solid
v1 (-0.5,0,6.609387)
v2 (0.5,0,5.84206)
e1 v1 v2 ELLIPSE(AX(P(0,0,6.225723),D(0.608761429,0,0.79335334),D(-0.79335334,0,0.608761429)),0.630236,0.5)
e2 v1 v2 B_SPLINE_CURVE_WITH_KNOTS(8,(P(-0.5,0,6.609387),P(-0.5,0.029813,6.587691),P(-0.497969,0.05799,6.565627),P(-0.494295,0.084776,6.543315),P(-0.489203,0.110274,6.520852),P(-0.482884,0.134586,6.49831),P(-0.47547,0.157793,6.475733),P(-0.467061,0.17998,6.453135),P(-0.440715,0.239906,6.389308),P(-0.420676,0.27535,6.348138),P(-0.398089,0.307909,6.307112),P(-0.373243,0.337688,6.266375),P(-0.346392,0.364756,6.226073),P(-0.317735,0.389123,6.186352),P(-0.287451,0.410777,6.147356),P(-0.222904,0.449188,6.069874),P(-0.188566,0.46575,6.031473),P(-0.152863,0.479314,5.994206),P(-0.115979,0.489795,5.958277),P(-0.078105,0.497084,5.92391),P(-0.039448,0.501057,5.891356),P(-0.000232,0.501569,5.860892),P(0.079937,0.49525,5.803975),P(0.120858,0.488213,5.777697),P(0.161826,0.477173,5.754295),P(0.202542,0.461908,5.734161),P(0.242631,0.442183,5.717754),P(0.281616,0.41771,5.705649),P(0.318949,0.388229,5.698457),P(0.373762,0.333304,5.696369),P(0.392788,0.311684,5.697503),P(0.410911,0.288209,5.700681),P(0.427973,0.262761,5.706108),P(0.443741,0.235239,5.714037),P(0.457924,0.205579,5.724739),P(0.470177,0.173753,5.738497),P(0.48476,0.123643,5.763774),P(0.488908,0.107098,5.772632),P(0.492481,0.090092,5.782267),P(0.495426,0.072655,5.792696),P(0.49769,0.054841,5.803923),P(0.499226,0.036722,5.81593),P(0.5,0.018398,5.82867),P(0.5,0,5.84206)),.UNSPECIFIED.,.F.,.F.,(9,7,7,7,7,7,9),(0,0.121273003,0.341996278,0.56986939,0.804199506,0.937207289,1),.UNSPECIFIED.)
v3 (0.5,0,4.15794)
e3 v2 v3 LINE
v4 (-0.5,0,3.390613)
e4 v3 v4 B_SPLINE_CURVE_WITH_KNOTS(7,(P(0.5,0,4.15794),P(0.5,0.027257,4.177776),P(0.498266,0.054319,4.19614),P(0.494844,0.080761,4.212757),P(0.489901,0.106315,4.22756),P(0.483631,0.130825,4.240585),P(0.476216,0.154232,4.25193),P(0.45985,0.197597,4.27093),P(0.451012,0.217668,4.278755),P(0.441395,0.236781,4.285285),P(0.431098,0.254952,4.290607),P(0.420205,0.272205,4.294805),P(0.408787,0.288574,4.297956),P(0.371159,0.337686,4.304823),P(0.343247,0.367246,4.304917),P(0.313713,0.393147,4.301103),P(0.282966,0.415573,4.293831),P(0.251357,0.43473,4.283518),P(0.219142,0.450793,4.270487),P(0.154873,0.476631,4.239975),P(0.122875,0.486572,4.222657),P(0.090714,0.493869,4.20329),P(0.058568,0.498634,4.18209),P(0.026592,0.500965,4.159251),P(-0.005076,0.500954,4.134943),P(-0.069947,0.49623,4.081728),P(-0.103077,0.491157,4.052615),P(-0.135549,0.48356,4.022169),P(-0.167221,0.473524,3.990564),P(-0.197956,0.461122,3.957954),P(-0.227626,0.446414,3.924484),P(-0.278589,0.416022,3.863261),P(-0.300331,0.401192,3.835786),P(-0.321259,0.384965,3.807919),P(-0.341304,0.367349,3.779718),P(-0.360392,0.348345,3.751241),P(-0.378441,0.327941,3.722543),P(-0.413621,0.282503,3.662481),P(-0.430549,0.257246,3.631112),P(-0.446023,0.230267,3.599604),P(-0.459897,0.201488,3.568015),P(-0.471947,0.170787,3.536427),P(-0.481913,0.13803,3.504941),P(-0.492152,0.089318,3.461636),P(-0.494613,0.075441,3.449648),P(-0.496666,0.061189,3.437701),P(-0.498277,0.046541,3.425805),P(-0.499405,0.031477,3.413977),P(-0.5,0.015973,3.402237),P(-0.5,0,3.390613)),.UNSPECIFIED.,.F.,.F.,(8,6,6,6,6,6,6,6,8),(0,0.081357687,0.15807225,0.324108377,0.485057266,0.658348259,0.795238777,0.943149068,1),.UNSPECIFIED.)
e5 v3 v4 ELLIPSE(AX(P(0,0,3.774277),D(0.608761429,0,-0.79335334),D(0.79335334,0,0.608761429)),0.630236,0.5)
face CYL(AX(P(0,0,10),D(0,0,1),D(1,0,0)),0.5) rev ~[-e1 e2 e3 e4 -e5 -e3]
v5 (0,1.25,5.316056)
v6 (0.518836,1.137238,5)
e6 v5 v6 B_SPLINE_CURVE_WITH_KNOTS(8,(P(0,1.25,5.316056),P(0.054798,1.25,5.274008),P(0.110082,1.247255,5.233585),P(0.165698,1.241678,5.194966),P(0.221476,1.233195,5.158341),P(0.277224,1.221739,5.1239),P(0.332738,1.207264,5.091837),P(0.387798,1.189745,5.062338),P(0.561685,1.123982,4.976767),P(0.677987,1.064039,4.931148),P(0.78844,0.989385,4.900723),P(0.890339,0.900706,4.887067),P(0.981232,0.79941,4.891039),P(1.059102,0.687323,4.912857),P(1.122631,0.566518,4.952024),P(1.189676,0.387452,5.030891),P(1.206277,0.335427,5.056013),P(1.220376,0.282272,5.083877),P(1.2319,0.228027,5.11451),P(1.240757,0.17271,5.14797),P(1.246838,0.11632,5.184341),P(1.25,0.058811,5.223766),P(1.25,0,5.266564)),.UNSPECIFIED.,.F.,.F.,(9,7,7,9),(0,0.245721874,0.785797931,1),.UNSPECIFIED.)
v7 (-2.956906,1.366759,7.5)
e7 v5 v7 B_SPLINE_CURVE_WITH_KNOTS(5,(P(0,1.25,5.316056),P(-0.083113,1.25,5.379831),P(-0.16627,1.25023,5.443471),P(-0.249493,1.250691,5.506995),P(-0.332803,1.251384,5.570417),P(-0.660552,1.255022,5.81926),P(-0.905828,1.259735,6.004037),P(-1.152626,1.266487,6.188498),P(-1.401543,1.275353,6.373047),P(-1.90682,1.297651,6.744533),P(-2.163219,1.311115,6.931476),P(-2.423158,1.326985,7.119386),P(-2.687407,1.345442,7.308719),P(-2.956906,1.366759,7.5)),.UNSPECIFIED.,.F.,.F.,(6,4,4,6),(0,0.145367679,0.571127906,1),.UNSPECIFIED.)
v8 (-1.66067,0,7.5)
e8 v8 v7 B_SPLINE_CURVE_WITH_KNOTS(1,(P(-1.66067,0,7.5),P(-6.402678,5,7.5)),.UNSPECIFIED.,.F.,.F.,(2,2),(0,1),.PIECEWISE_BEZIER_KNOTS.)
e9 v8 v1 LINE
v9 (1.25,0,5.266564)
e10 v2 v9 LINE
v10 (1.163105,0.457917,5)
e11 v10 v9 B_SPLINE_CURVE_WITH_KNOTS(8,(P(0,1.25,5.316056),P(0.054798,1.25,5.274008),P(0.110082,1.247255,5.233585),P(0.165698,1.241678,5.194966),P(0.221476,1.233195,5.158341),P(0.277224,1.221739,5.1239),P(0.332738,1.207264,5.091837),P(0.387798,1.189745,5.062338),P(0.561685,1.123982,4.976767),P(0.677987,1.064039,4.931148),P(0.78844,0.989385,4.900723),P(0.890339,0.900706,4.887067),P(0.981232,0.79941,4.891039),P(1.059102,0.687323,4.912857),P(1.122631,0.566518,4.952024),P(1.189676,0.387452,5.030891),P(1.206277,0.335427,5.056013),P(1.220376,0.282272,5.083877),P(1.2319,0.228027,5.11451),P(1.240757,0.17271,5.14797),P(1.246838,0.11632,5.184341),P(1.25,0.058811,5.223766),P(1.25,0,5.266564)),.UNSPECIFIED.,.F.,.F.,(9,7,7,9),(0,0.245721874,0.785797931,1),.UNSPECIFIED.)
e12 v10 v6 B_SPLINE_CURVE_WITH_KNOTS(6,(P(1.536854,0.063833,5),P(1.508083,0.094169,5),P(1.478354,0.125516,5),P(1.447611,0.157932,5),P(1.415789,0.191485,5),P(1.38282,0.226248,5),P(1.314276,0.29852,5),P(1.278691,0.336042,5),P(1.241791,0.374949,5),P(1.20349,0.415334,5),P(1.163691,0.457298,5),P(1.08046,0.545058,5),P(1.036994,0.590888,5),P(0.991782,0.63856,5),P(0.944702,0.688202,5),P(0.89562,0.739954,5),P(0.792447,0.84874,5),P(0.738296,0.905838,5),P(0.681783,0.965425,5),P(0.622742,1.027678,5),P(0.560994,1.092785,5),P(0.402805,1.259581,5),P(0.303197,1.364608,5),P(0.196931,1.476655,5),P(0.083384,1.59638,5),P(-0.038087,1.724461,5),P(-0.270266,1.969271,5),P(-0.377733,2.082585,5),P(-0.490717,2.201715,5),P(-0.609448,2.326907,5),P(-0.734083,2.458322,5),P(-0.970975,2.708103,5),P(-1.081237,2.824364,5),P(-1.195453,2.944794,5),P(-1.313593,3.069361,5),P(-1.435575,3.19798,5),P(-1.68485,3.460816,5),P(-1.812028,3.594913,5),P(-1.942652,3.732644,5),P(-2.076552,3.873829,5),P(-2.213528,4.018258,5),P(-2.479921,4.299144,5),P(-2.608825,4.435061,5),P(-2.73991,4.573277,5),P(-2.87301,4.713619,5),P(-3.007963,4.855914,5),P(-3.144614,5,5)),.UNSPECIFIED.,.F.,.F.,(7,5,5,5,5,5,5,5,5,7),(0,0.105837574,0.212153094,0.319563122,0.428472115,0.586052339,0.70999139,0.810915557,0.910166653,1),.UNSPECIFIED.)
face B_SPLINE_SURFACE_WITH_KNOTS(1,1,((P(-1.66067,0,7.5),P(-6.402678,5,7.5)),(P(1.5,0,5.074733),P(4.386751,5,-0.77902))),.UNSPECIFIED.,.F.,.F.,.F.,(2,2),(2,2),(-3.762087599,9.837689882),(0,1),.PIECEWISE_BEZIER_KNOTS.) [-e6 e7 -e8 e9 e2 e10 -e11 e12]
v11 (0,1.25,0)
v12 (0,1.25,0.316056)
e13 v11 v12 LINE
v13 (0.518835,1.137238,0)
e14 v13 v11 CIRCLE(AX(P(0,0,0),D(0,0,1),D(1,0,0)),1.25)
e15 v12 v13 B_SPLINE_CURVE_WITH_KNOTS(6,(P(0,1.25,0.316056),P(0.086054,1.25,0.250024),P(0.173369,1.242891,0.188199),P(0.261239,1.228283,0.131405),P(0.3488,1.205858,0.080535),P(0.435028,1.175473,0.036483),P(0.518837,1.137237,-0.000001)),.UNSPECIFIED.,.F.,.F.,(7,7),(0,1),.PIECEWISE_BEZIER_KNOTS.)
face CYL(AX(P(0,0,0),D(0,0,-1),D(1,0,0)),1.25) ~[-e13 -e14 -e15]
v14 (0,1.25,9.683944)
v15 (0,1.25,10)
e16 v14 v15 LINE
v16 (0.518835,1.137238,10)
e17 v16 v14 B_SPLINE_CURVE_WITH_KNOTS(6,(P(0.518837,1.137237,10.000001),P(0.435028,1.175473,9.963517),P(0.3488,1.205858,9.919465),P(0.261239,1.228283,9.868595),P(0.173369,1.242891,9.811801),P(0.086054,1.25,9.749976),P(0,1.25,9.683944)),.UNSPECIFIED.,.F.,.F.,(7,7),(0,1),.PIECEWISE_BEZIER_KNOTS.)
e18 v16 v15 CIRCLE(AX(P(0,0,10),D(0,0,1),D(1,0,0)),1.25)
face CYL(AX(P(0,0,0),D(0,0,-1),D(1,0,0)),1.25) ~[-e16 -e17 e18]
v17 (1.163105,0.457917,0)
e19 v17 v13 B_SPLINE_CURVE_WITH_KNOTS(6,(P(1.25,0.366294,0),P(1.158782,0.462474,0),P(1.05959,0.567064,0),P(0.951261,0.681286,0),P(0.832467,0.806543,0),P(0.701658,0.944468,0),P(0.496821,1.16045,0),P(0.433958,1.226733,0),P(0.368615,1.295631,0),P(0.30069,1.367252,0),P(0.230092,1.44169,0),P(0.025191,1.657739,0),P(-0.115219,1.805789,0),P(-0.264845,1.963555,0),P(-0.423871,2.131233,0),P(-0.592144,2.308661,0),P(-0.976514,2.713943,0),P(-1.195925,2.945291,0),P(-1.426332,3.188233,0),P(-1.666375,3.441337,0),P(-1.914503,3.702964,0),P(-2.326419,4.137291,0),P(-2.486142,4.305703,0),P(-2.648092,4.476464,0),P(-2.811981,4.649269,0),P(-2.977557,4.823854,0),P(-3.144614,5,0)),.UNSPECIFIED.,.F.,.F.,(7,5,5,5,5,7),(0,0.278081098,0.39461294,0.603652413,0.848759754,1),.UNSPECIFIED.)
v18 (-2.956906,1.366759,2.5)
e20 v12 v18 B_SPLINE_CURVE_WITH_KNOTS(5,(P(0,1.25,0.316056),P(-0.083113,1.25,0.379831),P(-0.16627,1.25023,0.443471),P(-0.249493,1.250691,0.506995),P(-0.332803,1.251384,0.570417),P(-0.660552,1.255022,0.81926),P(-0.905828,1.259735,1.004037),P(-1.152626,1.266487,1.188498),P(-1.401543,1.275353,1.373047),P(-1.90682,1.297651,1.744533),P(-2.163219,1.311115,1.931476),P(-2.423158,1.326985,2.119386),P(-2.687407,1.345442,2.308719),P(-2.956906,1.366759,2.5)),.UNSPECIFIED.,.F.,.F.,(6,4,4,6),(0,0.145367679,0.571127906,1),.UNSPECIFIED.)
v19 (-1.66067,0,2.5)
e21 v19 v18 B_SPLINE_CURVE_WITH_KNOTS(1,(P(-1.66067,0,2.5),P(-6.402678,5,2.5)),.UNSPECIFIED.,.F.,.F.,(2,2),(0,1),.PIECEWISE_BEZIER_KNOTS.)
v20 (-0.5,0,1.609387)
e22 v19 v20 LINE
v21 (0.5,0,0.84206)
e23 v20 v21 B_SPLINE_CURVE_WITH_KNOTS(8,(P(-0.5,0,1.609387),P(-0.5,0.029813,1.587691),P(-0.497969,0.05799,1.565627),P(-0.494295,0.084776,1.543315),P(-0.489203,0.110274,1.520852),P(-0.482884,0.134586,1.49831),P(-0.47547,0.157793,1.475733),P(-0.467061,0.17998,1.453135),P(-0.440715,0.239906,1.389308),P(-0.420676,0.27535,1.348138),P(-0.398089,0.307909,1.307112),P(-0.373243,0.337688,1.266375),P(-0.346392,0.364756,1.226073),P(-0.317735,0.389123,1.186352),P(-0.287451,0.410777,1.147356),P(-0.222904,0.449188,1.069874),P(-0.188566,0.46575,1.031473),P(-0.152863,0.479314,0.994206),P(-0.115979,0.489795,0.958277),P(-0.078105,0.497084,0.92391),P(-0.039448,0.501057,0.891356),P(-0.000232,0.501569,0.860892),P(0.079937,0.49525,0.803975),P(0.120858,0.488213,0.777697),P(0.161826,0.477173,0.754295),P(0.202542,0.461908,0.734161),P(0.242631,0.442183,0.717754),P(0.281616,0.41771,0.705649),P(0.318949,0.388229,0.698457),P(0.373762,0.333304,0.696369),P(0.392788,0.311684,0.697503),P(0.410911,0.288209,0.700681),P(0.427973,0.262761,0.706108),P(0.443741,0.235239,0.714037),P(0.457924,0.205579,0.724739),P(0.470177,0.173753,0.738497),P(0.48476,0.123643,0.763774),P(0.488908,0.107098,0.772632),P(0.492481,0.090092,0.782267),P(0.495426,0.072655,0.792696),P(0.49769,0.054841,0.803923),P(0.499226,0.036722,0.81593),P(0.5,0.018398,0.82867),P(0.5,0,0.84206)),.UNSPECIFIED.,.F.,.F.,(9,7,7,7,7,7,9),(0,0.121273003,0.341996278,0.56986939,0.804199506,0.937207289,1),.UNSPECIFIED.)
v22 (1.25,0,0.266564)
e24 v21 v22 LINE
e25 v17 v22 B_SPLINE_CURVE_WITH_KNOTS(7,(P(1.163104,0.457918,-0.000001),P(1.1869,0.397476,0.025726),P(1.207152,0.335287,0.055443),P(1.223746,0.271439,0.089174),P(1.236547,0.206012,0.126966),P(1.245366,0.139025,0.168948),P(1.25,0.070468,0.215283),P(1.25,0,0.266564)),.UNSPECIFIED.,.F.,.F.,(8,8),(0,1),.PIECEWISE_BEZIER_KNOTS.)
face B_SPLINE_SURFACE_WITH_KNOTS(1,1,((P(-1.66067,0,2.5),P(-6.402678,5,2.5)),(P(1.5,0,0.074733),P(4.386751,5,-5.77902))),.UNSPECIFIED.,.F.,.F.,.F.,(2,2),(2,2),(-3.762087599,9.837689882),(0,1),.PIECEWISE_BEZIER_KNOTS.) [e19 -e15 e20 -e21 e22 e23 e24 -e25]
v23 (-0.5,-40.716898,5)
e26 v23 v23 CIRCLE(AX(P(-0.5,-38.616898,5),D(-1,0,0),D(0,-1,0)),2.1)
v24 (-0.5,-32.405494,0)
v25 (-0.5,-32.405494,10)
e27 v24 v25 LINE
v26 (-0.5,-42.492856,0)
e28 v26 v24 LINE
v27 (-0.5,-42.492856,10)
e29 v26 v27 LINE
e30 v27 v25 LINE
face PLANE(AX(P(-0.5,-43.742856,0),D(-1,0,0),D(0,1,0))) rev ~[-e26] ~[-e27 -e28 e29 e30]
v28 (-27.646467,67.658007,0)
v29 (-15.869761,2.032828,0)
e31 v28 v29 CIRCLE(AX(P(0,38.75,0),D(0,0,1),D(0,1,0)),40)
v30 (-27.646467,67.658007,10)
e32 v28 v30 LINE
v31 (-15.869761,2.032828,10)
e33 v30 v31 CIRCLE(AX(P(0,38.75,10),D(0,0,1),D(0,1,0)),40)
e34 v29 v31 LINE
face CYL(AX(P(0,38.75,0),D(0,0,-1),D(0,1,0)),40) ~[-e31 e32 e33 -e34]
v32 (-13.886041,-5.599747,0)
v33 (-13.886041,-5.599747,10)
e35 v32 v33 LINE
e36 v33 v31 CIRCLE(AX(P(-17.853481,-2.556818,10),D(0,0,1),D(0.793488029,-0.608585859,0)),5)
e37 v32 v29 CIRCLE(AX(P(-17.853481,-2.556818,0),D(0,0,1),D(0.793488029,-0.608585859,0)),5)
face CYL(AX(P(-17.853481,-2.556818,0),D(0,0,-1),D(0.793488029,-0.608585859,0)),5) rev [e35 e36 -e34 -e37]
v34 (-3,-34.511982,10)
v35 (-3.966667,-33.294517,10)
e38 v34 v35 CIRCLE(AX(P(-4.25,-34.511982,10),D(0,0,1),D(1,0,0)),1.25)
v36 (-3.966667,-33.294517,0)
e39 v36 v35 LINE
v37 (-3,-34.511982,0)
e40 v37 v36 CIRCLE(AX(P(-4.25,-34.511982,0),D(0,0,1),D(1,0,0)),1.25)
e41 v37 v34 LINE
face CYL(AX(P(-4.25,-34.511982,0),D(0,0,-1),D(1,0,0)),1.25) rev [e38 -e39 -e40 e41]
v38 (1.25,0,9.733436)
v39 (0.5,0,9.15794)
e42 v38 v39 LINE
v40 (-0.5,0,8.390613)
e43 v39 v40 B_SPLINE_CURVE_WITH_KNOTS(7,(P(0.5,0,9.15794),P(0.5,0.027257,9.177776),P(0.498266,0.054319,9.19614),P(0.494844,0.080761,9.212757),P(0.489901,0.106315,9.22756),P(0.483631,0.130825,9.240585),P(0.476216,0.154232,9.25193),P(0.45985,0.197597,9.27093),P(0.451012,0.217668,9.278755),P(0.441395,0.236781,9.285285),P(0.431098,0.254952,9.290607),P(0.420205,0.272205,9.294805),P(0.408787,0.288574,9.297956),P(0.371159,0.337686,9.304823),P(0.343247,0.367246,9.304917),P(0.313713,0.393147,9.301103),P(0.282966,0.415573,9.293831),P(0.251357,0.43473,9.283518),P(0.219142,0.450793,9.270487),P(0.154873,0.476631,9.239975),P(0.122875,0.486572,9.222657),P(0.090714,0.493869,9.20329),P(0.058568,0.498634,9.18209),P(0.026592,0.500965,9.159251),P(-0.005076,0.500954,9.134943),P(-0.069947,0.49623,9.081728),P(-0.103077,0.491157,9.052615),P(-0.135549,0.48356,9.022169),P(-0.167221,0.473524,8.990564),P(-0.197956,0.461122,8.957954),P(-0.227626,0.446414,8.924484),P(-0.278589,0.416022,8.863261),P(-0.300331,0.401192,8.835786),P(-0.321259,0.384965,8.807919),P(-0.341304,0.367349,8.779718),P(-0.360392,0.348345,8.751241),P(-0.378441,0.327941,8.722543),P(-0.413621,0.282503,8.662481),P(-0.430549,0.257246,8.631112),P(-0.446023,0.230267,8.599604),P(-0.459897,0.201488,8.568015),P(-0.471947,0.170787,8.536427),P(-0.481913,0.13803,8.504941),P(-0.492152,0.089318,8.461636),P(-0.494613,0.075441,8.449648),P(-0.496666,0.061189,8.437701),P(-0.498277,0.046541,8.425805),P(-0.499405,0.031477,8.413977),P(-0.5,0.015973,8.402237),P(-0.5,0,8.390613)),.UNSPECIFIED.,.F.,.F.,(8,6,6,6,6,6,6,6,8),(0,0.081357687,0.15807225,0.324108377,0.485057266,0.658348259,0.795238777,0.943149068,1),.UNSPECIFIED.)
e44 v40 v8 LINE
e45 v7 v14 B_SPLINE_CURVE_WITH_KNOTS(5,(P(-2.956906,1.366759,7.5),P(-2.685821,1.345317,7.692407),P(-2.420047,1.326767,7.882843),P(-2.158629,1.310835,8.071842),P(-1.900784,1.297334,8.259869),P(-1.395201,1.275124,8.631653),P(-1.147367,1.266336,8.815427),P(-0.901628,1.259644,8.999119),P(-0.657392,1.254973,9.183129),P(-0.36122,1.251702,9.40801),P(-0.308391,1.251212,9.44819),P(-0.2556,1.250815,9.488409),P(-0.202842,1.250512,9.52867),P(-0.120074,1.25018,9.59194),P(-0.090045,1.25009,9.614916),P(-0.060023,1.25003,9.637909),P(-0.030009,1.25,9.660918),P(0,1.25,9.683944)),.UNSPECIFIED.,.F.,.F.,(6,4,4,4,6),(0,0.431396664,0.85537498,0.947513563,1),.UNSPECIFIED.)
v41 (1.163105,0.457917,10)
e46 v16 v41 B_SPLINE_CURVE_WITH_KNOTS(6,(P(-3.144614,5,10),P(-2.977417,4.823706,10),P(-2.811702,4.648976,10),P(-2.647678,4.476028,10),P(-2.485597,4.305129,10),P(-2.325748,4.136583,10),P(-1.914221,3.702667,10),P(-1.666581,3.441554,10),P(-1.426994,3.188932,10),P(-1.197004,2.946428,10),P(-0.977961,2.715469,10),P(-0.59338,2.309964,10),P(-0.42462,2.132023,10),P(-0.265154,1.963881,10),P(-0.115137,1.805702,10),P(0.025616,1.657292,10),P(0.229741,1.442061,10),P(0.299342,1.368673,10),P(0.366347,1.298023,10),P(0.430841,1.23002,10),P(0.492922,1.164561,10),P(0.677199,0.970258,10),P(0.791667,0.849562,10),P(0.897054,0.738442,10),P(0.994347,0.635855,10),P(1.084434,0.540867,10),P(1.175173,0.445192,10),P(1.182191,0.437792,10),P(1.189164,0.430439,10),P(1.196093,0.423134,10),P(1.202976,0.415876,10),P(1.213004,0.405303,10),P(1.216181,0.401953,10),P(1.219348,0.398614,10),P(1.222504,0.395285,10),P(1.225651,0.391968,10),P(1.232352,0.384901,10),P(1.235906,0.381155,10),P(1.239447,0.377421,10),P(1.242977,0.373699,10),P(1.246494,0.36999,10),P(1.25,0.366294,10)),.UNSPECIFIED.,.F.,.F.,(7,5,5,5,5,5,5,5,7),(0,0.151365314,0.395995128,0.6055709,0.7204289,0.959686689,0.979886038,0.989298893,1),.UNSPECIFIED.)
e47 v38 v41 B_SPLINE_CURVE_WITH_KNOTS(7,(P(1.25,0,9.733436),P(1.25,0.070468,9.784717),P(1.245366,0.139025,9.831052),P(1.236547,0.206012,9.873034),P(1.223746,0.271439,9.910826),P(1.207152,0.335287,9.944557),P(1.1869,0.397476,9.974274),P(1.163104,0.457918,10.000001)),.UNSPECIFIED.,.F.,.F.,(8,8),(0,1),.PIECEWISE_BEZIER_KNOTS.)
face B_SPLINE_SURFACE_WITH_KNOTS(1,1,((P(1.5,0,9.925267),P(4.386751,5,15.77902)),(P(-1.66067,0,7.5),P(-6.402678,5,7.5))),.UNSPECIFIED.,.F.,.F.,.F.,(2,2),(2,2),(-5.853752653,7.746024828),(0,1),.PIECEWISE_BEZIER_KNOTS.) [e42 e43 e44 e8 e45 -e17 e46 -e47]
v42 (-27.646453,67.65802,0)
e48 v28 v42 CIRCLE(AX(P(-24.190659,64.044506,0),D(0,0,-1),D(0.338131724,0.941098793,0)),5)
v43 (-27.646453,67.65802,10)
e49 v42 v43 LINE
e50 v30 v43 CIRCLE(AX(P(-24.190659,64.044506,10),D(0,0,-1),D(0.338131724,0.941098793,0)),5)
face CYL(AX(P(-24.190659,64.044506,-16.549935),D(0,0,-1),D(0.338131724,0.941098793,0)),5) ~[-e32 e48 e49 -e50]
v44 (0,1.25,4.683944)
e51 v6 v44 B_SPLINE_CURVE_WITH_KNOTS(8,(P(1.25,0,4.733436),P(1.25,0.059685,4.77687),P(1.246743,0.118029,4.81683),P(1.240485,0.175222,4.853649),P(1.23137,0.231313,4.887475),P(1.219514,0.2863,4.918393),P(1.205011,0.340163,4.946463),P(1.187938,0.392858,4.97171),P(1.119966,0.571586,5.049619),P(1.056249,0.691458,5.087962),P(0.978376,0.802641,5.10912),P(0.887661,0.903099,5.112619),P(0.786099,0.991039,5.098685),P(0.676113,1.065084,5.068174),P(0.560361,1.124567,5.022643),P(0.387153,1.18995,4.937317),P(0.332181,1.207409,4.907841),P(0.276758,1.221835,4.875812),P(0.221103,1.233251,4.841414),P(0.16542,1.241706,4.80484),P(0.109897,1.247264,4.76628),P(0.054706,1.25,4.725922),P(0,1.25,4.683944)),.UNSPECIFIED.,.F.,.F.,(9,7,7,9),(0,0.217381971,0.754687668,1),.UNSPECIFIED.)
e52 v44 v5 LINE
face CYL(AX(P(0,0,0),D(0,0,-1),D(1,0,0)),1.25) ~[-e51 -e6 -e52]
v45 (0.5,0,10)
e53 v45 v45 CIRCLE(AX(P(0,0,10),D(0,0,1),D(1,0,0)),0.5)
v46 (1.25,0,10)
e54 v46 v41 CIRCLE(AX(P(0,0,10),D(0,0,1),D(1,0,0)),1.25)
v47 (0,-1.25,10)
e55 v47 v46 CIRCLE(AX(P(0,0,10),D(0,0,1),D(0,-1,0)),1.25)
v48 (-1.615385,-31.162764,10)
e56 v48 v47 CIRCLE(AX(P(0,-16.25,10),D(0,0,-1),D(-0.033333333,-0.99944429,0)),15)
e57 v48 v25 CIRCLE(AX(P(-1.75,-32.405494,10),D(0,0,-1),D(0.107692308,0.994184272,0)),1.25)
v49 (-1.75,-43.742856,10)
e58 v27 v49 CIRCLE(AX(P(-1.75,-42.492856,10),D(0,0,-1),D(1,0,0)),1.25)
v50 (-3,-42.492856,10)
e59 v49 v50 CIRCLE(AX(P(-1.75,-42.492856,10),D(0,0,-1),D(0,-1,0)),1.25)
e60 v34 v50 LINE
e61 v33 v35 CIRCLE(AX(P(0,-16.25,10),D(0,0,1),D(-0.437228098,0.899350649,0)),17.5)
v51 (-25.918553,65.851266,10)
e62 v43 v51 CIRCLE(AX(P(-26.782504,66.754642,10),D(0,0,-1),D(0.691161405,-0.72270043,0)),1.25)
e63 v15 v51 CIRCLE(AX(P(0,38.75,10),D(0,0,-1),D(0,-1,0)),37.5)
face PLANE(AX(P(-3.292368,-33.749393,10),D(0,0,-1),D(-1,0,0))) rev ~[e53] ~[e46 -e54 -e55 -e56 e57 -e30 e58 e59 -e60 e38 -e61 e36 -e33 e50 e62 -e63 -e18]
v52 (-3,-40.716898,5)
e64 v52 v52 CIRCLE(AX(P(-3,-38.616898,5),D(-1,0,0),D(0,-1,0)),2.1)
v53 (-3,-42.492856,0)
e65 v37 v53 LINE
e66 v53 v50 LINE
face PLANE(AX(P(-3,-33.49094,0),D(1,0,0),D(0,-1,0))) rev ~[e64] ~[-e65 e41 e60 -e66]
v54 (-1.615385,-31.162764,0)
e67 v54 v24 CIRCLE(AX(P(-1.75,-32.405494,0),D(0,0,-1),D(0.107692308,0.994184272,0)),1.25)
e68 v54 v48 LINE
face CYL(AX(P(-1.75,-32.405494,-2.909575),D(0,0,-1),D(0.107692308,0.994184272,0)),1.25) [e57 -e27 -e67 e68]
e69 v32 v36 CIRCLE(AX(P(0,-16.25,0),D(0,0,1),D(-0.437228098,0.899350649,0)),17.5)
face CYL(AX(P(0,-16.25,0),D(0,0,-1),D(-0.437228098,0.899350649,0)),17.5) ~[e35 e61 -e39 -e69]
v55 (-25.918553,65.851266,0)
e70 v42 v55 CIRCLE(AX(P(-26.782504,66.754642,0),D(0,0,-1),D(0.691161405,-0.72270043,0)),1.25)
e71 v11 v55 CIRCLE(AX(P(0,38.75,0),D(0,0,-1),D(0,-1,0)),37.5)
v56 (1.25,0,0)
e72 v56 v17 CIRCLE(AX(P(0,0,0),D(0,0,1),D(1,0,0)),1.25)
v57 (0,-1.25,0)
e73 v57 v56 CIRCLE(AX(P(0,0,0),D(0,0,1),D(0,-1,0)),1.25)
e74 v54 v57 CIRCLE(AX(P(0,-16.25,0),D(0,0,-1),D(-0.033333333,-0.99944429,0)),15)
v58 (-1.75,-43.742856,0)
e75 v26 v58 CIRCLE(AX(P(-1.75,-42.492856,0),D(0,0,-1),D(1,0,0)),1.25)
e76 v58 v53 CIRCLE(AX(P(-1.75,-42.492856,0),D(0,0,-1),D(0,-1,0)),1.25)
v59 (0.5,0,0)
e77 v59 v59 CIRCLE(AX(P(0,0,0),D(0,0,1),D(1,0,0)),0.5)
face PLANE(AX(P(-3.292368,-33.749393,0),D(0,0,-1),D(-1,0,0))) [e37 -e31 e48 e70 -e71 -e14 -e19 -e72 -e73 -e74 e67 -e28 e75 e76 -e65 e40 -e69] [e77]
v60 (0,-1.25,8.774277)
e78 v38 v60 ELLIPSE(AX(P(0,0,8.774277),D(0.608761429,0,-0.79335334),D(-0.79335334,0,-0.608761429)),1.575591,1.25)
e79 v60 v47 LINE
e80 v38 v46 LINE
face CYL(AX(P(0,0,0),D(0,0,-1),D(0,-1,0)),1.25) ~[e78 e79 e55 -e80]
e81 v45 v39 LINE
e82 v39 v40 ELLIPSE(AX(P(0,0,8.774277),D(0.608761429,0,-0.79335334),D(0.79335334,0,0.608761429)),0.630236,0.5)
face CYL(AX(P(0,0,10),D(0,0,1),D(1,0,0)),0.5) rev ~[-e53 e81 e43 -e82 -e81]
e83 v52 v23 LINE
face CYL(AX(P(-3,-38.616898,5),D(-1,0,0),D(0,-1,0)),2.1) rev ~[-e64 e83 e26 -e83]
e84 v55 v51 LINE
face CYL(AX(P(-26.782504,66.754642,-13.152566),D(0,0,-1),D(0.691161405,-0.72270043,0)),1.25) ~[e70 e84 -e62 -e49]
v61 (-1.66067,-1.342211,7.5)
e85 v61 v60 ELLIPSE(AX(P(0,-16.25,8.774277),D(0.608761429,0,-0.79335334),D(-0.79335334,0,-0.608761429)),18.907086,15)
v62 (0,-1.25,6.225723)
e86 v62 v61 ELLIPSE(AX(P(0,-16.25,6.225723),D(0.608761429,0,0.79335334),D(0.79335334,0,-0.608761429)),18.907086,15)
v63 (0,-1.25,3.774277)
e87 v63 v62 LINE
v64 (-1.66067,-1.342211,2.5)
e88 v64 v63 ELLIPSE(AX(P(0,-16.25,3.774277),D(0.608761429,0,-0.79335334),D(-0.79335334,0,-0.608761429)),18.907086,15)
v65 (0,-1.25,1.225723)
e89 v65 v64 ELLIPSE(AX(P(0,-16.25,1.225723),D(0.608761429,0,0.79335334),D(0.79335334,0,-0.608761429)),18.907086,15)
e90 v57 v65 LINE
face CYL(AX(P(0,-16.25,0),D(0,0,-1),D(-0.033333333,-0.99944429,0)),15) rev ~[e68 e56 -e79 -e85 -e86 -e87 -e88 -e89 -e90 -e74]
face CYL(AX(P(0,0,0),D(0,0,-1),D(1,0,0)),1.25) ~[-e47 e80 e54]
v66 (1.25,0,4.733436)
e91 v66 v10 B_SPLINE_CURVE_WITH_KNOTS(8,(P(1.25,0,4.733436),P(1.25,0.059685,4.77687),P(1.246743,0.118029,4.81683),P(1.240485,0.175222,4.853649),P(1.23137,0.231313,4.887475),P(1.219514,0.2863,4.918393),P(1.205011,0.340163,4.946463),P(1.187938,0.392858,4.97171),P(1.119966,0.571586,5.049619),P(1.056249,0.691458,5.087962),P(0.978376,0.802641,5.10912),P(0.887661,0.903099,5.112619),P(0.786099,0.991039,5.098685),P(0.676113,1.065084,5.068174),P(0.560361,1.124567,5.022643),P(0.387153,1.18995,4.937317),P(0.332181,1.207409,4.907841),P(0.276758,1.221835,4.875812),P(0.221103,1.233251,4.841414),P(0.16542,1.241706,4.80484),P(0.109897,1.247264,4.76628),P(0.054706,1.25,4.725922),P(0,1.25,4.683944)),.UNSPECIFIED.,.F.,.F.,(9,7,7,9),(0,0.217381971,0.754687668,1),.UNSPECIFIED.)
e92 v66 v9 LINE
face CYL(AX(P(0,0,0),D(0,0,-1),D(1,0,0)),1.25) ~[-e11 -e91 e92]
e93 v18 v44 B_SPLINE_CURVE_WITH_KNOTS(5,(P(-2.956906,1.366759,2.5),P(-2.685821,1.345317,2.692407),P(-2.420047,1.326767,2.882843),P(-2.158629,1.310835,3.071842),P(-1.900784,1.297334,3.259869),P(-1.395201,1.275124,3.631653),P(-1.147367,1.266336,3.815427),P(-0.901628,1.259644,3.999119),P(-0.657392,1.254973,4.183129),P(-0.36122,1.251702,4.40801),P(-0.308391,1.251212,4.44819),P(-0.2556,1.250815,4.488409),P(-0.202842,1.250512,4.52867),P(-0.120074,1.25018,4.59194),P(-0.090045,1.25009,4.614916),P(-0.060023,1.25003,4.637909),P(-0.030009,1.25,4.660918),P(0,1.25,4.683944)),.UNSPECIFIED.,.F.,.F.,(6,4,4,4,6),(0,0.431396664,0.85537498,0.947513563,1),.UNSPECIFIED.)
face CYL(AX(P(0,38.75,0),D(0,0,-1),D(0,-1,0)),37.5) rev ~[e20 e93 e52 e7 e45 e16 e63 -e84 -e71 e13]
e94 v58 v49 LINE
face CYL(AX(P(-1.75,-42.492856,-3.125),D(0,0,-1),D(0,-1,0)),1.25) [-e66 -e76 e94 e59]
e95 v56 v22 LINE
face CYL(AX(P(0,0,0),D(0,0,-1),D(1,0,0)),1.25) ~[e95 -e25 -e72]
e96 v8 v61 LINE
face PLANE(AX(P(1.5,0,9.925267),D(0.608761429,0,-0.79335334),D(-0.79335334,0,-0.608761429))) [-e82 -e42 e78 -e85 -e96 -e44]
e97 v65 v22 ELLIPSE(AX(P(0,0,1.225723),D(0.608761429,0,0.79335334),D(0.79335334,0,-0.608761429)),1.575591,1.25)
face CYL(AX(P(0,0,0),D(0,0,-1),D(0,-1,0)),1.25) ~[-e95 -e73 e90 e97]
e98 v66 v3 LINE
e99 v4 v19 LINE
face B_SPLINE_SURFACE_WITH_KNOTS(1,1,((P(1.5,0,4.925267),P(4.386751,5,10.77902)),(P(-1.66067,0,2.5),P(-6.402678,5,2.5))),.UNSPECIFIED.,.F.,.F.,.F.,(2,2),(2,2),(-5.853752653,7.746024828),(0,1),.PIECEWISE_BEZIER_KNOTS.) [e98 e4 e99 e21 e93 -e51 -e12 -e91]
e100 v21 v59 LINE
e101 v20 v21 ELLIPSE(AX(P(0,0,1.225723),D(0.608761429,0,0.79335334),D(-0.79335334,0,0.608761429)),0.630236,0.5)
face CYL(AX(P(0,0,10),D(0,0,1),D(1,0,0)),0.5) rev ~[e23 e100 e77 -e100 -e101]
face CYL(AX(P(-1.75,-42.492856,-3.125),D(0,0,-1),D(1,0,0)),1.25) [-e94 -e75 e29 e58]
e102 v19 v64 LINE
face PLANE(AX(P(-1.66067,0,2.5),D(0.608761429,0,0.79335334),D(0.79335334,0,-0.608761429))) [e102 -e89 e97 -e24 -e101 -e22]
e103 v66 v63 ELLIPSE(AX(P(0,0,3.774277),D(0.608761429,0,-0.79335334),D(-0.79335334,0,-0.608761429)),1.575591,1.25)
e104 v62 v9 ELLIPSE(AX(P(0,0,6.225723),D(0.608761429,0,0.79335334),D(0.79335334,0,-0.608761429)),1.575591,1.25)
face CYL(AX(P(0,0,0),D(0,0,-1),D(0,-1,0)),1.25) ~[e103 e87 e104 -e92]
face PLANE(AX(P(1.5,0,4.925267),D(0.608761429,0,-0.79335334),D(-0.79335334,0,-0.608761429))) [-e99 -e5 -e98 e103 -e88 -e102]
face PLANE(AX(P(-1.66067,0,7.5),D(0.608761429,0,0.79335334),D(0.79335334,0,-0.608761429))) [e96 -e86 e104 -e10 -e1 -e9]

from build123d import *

# Parameters (mm, degrees)
F1_DEPTH       = 10
F2_W           = 45
F2_H           = 10
F3_DEPTH       = 10
F4_R           = 0.5
F5_DEPTH       = 10
F6_R           = 2.1
F7_DEPTH       = 2.5
F8_T1_DEPTH    = 10
F8_T3_DEPTH    = 43.0998702926
F9_T1_DEPTH    = 10
F9_T3_DEPTH    = 15.8191503542
F9_T5_DEPTH    = 16.25
F9_T7_DEPTH    = 36.3051320704
F11_DEPTH      = 5
F11_TAPER      = -30
F11_DEPTH_BACK = 5


# Not quite as in the source:
# - a fillet or chamfer that OpenCascade refuses, or shapes differently, is made with other operations: its cross-section is extruded or revolved along the edge and cut away or added


with BuildPart() as f1:
    # F0 (on Top) → F1 (new body)
    with BuildSketch(Plane.XY):
        with BuildLine():
            ThreePointArc((0, -1.25), (0.8838834765, -0.8838834765), (1.25, 0))
            ThreePointArc((1.25, 0), (0.8838834765, 0.8838834765), (0, 1.25))
            ThreePointArc((0, 1.25), (-1.25, 0), (0, -1.25))
        make_face()
        with BuildLine():
            ThreePointArc((0, -1.25), (-1.25, 0), (0, 1.25))
            ThreePointArc((0, 1.25), (-3.9258033341, 0.8039751431), (-7.6514917116, -0.5113636364))
            ThreePointArc((-7.6514917116, -0.5113636364), (-3.8435305739, -1.0649126927), (0, -1.25))
        make_face()
        with BuildLine():
            ThreePointArc((-7.6514917116, -0.5113636364), (-3.9258033341, 0.8039751431), (0, 1.25))
            ThreePointArc((0, 1.25), (-37.5, 38.75), (0, 76.25))
            Line((0, 76.25), (0, 78.75))
            ThreePointArc((0, 78.75), (-39.8149126927, 42.5935305739), (-7.6514917116, -0.5113636364))
        make_face()
        with BuildLine():
            ThreePointArc((-0.5, -31.2416643506), (-14.9979159429, -15.9999652609), (0, -1.25))
            ThreePointArc((0, -1.25), (-3.8435305739, -1.0649126927), (-7.6514917116, -0.5113636364))
            ThreePointArc((-7.6514917116, -0.5113636364), (-17.3284932243, -18.69403817), (-3, -33.4909396496))
            Line((-3, -33.4909396496), (-3, -31.2416643506))
            Line((-3, -31.2416643506), (-0.5, -31.2416643506))
        make_face()
        with BuildLine():
            Line((-0.5, -33.7428556845), (-0.5, -31.2416643506))
            Line((-0.5, -31.2416643506), (-3, -31.2416643506))
            Line((-3, -31.2416643506), (-3, -33.4909396496))
            ThreePointArc((-3, -33.4909396496), (-1.7545271221, -33.661824562), (-0.5, -33.7428556845))
        make_face()
        with BuildLine():
            ThreePointArc((-0.5, -33.7428556845), (-1.7545271221, -33.661824562), (-3, -33.4909396496))
            Line((-3, -33.4909396496), (-3, -43.7428556845))
            Line((-3, -43.7428556845), (-0.5, -43.7428556845))
            Line((-0.5, -43.7428556845), (-0.5, -33.7428556845))
        make_face()
    extrude(amount=F1_DEPTH)

    # F2 (on Top) → F3 (cut, through all)
    with BuildSketch(Plane.XY):
        with Locations((0, 73.75)):
            Rectangle(F2_W, F2_H)
    extrude(amount=F3_DEPTH, mode=Mode.SUBTRACT)

    # F4 (on face) → F5 (cut, through all)
    with BuildSketch(Plane.XY.offset(10)):
        Circle(F4_R)
    extrude(amount=-F5_DEPTH, mode=Mode.SUBTRACT)

    # F6 (on face) → F7 (cut, through all)
    with BuildSketch(Plane(origin=(-3, 0, 0), x_dir=(0, -1, 0), z_dir=(-1, 0, 0))):
        with Locations((38.6168976671, 5)):
            Circle(F6_R)
    extrude(amount=-F7_DEPTH, mode=Mode.SUBTRACT)

    # F8: fillet of radius 5 on 2 edges, made by hand

    # F8_s2 → F8_t1 (join)
    with BuildSketch(Plane.XY):
        with BuildLine():
            ThreePointArc((-13.8860405137, -5.5997474747), (-13.0142523991, -1.2990941124), (-15.8697605871, 2.0328282828))
            ThreePointArc((-15.8697605871, 2.0328282828), (-11.8292246388, 0.5391449396), (-7.6514917116, -0.5113636364))
            ThreePointArc((-7.6514917116, -0.5113636364), (-11.0652264374, -2.6923171637), (-13.8860405137, -5.5997474747))
        make_face()
    extrude(amount=F8_T1_DEPTH)

    # F8_s4 → F8_t3 (cut)
    with BuildSketch(Plane.XY.offset(-16.5499351463)):
        with BuildLine():
            ThreePointArc((-22.5, 68.75), (-25.2284691248, 68.9356152516), (-27.6464669917, 67.6580068991))
            ThreePointArc((-27.6464669917, 67.6580068991), (-25.1595214868, 69.8465991477), (-22.5, 71.8218913883))
            Line((-22.5, 71.8218913883), (-22.5, 68.75))
        make_face()
    extrude(amount=F8_T3_DEPTH, mode=Mode.SUBTRACT)

    # F9: fillet of radius 1.25 on 5 edges, made by hand

    # F9_s2 → F9_t1 (join)
    with BuildSketch(Plane.XY):
        with BuildLine():
            ThreePointArc((-3, -34.5119823677), (-3.2710549896, -33.73470078), (-3.9666666667, -33.2945168766))
            ThreePointArc((-3.9666666667, -33.2945168766), (-3.4847175764, -33.3995406181), (-3, -33.4909396496))
            Line((-3, -33.4909396496), (-3, -34.5119823677))
        make_face()
    extrude(amount=F9_T1_DEPTH)

    # F9_s4 → F9_t3 (cut)
    with BuildSketch(Plane.XY.offset(-2.9095751771)):
        with BuildLine():
            ThreePointArc((-1.6153846154, -31.1627640813), (-0.8197394906, -31.5705600619), (-0.5, -32.4054944214))
            Line((-0.5, -32.4054944214), (-0.5, -31.2416643506))
            ThreePointArc((-0.5, -31.2416643506), (-1.0584277637, -31.2126110913), (-1.6153846154, -31.1627640813))
        make_face()
    extrude(amount=F9_T3_DEPTH, mode=Mode.SUBTRACT)

    # F9_s6 → F9_t5 (cut)
    with BuildSketch(Plane.XY.offset(-3.125)):
        with BuildLine():
            ThreePointArc((-0.5, -42.4928556845), (-0.8661165235, -43.376739161), (-1.75, -43.7428556845))
            Line((-1.75, -43.7428556845), (-0.5, -43.7428556845))
            Line((-0.5, -43.7428556845), (-0.5, -42.4928556845))
        make_face()
        with BuildLine():
            ThreePointArc((-1.75, -43.7428556845), (-2.6338834765, -43.376739161), (-3, -42.4928556845))
            Line((-3, -42.4928556845), (-3, -43.7428556845))
            Line((-3, -43.7428556845), (-1.75, -43.7428556845))
        make_face()
    extrude(amount=F9_T5_DEPTH, mode=Mode.SUBTRACT)

    # F9_s8 → F9_t7 (cut)
    with BuildSketch(Plane.XY.offset(-13.1525660352)):
        with BuildLine():
            ThreePointArc((-25.9185526928, 65.8512661385), (-25.8791274069, 67.6185918599), (-27.6464530598, 67.658020223))
            ThreePointArc((-27.6464530598, 67.658020223), (-25.2284596959, 68.9356172522), (-22.5, 68.75))
            ThreePointArc((-22.5, 68.75), (-24.2526230688, 67.3517529932), (-25.9185526928, 65.8512661385))
        make_face()
    extrude(amount=F9_T7_DEPTH, mode=Mode.SUBTRACT)

    # F10 (on Front) → F11 (cut, two sides)
    with BuildSketch(Plane.XZ) as f11_sk:
        Polygon((1.5, 0.0747326796), (1.5, 4.9252673204), (-1.6606699079, 2.5), align=None)
        Polygon((1.5, 9.9252673204), (-1.6606699079, 7.5), (1.5, 5.0747326796), align=None)
    extrude(amount=-F11_DEPTH, taper=F11_TAPER, mode=Mode.SUBTRACT)
    extrude(f11_sk.sketch, amount=F11_DEPTH_BACK, mode=Mode.SUBTRACT)


solid = f1.part
